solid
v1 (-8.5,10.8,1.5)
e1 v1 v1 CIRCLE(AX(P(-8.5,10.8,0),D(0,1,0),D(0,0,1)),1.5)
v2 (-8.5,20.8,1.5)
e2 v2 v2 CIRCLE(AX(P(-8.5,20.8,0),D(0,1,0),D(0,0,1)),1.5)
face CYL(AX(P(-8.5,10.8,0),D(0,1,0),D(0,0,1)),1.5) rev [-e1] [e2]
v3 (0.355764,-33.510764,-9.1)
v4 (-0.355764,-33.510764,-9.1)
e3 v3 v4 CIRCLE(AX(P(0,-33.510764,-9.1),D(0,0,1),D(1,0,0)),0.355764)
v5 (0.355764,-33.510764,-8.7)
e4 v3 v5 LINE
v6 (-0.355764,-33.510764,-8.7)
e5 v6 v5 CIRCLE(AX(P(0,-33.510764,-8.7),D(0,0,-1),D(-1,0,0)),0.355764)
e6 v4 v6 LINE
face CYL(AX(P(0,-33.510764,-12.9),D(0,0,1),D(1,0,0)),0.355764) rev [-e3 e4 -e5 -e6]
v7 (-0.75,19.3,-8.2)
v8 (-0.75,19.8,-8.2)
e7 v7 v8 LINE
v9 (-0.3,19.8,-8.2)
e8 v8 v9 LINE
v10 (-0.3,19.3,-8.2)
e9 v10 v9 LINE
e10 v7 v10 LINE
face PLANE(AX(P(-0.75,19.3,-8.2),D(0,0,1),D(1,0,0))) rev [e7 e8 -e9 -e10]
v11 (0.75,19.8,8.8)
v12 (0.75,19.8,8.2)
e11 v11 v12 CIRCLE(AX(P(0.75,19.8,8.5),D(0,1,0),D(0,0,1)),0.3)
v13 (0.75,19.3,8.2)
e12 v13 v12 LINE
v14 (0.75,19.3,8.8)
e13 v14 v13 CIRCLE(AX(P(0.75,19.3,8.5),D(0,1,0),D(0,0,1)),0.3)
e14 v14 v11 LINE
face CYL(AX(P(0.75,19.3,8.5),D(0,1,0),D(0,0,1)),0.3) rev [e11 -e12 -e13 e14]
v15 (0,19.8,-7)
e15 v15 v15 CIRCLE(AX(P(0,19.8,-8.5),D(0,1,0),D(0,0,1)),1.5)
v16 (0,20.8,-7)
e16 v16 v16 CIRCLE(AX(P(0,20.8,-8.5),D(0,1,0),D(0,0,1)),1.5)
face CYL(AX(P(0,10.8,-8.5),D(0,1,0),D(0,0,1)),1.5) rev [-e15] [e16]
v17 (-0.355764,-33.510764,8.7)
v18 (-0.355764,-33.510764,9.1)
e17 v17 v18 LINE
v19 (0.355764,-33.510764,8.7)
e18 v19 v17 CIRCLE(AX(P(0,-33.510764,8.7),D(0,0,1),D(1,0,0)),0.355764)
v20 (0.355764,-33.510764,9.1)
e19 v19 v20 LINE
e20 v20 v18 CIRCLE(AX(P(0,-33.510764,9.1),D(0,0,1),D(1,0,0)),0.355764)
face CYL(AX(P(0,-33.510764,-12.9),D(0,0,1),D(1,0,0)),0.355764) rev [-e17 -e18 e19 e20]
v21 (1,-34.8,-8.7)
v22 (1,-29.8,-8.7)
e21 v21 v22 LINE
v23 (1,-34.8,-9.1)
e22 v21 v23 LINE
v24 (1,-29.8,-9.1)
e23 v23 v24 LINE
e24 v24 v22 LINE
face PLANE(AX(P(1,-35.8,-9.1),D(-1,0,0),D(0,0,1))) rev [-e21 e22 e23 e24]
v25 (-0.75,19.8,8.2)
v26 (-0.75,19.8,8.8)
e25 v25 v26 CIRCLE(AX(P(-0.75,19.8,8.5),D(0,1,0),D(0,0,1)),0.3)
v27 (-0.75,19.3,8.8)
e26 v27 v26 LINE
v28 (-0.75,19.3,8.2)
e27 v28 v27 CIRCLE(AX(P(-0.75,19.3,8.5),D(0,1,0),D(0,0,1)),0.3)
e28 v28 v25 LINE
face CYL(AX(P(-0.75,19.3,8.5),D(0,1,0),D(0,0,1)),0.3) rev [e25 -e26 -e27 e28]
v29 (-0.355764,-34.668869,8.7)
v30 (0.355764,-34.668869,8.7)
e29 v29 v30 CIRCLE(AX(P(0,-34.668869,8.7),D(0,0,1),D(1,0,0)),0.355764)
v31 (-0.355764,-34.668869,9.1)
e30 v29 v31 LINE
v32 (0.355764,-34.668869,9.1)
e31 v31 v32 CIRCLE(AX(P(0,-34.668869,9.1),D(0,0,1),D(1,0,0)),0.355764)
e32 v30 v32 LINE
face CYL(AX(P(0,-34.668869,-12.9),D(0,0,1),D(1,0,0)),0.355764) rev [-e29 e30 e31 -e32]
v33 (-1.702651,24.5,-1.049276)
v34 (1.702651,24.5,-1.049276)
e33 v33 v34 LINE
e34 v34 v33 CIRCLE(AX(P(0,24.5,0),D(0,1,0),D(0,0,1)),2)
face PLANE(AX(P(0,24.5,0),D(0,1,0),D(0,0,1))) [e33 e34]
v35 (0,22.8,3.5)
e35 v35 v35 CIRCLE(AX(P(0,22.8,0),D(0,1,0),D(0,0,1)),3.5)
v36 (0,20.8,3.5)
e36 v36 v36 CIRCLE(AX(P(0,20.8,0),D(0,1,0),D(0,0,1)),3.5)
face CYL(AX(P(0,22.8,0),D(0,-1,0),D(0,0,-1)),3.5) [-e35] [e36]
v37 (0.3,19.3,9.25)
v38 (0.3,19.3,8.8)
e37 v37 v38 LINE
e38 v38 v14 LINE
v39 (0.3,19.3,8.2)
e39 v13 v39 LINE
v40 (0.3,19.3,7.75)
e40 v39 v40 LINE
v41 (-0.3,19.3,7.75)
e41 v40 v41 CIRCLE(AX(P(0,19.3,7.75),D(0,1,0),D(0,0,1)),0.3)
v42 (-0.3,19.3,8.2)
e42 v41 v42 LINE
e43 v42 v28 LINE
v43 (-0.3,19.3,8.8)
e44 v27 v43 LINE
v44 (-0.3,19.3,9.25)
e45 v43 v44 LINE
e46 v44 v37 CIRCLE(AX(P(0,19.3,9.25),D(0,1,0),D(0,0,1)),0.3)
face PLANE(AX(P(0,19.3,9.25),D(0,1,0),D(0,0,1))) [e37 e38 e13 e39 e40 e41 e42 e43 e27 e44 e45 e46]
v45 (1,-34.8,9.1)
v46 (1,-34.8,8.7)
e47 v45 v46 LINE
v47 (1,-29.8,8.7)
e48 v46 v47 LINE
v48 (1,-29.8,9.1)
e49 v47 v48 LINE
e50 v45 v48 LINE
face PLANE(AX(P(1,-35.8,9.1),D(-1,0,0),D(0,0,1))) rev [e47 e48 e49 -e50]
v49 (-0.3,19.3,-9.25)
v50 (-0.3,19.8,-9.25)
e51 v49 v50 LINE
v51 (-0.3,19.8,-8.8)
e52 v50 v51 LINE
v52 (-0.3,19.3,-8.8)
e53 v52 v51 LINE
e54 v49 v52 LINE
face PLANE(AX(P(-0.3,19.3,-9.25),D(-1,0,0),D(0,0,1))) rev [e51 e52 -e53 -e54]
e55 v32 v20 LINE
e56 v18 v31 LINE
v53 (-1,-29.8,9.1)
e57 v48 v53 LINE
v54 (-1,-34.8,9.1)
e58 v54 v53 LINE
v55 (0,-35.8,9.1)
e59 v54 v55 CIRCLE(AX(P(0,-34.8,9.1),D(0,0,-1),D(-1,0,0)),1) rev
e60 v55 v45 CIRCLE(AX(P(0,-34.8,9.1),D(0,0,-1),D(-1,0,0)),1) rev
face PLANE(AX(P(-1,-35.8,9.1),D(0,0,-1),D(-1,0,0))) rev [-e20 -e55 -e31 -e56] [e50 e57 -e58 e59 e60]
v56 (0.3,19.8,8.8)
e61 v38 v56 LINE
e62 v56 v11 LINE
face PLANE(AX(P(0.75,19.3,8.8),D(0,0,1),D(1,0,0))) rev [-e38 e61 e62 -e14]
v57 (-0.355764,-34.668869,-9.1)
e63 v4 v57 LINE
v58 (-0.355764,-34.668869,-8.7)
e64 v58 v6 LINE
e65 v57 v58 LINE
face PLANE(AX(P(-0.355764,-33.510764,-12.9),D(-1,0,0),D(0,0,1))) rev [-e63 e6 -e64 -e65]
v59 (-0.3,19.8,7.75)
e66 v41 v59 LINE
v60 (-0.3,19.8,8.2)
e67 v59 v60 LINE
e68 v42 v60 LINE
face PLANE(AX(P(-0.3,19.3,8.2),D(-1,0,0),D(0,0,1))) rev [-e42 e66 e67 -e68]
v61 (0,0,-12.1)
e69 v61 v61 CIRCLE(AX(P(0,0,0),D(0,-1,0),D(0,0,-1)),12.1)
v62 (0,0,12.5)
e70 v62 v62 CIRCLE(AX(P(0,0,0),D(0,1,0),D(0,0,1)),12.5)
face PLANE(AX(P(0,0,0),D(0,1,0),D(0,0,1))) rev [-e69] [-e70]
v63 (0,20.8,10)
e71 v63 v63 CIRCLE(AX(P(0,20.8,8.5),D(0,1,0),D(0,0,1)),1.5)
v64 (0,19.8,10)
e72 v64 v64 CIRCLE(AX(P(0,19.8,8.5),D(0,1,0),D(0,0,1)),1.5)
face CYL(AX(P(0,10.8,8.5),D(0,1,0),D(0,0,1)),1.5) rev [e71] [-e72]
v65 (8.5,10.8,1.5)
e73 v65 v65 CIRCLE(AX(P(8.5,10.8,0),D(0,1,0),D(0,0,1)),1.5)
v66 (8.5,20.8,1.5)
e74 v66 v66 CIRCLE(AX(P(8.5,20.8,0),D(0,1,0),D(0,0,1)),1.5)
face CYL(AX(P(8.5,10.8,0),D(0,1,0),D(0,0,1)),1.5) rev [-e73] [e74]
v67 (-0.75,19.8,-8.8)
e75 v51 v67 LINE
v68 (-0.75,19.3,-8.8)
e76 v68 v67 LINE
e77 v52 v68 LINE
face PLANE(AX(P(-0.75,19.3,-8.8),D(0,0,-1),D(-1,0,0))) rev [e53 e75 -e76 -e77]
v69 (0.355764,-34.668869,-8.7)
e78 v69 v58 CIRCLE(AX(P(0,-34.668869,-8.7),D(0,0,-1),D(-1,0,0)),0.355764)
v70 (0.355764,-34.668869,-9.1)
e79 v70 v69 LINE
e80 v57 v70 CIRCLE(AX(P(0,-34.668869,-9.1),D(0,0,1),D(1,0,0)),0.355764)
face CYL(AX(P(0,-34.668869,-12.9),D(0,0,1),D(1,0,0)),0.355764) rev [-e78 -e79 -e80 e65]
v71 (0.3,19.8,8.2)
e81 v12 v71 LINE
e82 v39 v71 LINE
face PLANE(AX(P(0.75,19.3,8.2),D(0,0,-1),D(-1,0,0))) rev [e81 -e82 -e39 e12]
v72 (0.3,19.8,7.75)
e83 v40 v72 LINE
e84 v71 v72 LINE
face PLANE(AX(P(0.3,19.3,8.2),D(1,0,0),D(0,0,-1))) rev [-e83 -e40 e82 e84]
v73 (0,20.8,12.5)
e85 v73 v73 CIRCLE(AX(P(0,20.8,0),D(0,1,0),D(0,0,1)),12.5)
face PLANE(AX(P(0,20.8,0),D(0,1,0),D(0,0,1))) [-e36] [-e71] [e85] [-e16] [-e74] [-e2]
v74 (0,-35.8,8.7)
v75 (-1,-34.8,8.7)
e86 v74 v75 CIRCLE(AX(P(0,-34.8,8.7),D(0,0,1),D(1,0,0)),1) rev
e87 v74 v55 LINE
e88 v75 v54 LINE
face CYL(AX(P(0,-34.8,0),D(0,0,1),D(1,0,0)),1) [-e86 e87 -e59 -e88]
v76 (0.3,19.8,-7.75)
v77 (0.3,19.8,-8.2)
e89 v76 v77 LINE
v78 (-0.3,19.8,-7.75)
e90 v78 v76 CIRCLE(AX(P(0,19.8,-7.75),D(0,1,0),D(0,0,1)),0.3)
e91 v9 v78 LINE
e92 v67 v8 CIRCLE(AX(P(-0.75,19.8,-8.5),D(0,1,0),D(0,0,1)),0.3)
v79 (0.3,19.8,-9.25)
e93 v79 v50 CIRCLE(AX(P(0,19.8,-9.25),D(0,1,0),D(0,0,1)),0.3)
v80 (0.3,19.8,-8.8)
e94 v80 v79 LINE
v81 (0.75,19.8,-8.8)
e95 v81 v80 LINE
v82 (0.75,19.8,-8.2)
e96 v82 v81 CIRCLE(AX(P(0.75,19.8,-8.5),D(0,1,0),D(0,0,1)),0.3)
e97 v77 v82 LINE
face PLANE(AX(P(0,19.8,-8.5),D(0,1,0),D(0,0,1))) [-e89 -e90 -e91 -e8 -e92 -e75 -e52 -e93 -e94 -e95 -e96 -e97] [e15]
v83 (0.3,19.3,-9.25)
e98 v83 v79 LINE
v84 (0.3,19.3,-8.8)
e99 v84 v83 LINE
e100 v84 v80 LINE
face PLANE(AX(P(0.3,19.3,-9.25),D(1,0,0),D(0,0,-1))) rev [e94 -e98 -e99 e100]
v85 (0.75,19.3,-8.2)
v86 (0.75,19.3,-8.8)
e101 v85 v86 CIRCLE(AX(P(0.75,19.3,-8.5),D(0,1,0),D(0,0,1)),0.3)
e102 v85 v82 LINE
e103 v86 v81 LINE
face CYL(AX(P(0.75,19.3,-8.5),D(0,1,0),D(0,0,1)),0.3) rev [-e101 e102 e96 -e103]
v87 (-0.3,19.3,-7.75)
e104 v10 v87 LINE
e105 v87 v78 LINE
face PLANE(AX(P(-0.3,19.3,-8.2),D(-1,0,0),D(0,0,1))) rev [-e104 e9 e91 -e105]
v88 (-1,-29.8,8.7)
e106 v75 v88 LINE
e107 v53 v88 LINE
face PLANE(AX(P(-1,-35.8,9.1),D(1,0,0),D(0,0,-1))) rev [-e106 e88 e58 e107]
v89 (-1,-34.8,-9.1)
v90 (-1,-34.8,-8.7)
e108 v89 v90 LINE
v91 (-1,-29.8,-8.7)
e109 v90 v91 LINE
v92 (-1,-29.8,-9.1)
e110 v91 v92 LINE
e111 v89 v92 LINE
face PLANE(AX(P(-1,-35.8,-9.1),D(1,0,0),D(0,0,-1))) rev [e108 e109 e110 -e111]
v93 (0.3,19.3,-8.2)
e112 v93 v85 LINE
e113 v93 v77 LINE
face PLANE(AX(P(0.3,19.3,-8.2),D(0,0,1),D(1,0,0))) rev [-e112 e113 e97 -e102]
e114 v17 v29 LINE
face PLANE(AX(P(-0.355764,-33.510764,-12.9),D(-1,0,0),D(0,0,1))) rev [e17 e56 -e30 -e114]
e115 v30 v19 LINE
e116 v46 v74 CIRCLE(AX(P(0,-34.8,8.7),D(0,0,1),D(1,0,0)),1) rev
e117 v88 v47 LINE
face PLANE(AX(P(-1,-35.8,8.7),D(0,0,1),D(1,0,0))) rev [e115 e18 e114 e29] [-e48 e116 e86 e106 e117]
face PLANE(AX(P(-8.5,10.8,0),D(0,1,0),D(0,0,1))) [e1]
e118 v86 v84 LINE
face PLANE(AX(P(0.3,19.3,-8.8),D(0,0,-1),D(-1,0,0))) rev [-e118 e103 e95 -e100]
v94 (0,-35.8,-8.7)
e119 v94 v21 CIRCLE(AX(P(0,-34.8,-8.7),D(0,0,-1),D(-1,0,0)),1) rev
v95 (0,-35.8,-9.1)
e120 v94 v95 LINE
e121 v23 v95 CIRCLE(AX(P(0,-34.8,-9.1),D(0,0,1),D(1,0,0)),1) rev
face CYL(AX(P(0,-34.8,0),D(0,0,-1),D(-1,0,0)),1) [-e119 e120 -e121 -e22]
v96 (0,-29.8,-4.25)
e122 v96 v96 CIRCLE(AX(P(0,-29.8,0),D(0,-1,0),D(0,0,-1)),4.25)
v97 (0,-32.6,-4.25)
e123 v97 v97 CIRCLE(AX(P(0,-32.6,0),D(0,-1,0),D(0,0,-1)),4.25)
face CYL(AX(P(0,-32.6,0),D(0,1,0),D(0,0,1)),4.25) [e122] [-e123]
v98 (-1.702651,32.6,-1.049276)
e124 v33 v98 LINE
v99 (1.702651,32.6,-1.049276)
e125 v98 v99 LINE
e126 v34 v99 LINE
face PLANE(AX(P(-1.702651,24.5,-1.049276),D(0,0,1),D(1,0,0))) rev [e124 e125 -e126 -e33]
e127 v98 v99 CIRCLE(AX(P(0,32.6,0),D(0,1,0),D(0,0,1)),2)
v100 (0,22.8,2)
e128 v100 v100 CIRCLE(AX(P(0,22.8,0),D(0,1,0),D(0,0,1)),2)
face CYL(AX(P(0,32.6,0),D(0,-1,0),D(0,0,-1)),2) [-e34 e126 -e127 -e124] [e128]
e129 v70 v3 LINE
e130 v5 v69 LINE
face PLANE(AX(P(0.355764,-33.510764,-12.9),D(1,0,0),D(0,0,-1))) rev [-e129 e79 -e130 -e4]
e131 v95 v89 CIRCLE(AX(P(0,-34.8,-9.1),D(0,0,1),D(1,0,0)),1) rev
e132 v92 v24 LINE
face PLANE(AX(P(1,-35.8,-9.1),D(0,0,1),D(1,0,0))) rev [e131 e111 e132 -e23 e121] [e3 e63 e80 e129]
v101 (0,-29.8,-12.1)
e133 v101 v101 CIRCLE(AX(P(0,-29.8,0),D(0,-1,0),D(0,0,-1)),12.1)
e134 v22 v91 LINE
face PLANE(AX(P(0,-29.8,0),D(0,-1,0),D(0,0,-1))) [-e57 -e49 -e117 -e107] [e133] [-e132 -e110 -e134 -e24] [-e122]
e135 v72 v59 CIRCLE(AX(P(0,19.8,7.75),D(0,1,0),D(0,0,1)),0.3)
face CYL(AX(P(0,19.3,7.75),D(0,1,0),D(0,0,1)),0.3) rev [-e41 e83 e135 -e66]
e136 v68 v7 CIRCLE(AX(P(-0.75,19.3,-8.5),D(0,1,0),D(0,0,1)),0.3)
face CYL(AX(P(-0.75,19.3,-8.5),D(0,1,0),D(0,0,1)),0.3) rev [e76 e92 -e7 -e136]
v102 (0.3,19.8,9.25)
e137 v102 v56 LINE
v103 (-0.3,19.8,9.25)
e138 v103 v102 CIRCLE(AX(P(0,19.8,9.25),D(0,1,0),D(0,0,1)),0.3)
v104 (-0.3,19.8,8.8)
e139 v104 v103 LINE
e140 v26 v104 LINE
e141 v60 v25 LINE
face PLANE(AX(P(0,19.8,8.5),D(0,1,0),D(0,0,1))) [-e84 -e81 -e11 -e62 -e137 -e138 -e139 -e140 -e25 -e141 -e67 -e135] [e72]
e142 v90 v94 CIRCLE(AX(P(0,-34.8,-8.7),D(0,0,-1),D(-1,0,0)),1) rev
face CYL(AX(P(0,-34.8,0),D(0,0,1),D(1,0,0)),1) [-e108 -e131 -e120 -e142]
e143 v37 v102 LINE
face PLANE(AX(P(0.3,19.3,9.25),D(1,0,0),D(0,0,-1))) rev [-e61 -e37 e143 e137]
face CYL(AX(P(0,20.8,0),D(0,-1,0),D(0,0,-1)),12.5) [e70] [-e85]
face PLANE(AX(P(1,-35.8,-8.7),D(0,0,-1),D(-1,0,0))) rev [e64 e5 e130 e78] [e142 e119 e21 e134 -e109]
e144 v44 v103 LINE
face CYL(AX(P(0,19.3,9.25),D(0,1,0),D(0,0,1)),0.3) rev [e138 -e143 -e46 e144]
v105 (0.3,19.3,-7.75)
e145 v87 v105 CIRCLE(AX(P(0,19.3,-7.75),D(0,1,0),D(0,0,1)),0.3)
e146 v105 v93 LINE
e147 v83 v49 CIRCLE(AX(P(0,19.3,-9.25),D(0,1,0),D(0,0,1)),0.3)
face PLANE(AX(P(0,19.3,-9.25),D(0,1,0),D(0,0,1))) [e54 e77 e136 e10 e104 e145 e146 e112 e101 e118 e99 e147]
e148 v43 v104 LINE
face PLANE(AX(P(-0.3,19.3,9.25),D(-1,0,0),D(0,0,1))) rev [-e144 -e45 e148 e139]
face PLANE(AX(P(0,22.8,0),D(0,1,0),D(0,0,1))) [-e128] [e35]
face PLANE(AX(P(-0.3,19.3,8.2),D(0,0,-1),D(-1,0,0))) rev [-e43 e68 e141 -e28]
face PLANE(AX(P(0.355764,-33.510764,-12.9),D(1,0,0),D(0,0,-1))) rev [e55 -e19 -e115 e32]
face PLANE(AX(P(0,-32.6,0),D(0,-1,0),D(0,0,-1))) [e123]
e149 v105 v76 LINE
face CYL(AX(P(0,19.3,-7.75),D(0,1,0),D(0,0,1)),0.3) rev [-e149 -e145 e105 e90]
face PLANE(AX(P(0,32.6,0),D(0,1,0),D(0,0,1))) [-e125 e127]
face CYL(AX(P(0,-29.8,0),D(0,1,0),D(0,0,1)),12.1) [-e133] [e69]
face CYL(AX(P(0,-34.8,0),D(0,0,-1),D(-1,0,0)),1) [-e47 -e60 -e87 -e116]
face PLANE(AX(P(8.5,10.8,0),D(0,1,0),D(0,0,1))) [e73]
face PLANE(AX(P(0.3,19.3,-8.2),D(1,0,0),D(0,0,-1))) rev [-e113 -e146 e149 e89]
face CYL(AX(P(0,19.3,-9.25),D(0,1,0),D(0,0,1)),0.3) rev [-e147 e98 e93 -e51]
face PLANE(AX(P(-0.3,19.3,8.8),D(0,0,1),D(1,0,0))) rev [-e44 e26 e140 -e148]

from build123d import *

# Parameters (mm, degrees)
ESBO_O1_R                = 12.5
RESSALTO_EXTRUS_O1_DEPTH = 20.8
ESBO_O2_R                = 12.1
RESSALTO_EXTRUS_O2_DEPTH = 29.8
ESBO_O3_R                = 2
RESSALTO_EXTRUS_O3_DEPTH = 11.8
CORTE_EXTRUS_O1_START    = -8.1
CORTE_EXTRUS_O1_DEPTH    = 8.1
ESBO_O5_R                = 3.5
RESSALTO_EXTRUS_O4_DEPTH = 2
ESBO_O6_R                = 1.5
CORTE_EXTRUS_O2_DEPTH    = 10
RESSALTO_EXTRUS_O5_START = 9
ESBO_O8_R                = 1.5
RESSALTO_EXTRUS_O5_DEPTH = 9
CORTE_EXTRUS_O3_DEPTH    = 0.5
ESBO_O10_R               = 4.25
RESSALTO_EXTRUS_O6_DEPTH = 2.8
ESBO_O11_W               = 2
ESBO_O11_H               = 0.4
RESSALTO_EXTRUS_O8_DEPTH = 6
FILETE1_R                = 1
CORTE_EXTRUS_O4_DEPTH    = 22


with BuildPart() as part:
    # Esboço1 → Ressalto-extrusão1 (new body)
    with BuildSketch(Plane(origin=(0, 0, 0), x_dir=(1, 0, 0), z_dir=(0, 1, 0))):
        with Locations(Location((0, 0, 0), (0, 0, 270))):
            Circle(ESBO_O1_R)
    extrude(amount=RESSALTO_EXTRUS_O1_DEPTH)

    # Esboço2 → Ressalto-extrusão2 (add)
    with BuildSketch(Plane(origin=(0, 0, 0), x_dir=(-1, 0, 0), z_dir=(0, -1, 0))):
        with Locations(Location((0, 0, 0), (0, 0, 90))):
            Circle(ESBO_O2_R)
    extrude(amount=RESSALTO_EXTRUS_O2_DEPTH)

    # Esboço3 → Ressalto-extrusão3 (add)
    with BuildSketch(Plane(origin=(0, 20.8, 0), x_dir=(1, 0, 0), z_dir=(0, 1, 0))):
        with Locations(Location((0, 0, 0), (0, 0, 270))):
            Circle(ESBO_O3_R)
    extrude(amount=RESSALTO_EXTRUS_O3_DEPTH)

    # Esboço4 → Corte-extrusão1 (cut)
    with BuildSketch(Plane(origin=(0, 32.6, 0), x_dir=(1, 0, 0), z_dir=(0, 1, 0)).offset(CORTE_EXTRUS_O1_START)):
        with BuildLine():
            Line((-1.702650866, 1.049275955), (1.702650866, 1.049275955))
            ThreePointArc((1.702650866, 1.049275955), (0, 2), (-1.702650866, 1.049275955))
        make_face()
    extrude(amount=CORTE_EXTRUS_O1_DEPTH, mode=Mode.SUBTRACT)

    # Esboço5 → Ressalto-extrusão4 (add)
    with BuildSketch(Plane(origin=(0, 20.8, 0), x_dir=(1, 0, 0), z_dir=(0, 1, 0))):
        with Locations(Location((0, 0, 0), (0, 0, 270))):
            Circle(ESBO_O5_R)
    extrude(amount=RESSALTO_EXTRUS_O4_DEPTH)

    # Esboço6 → Corte-extrusão2 (cut)
    with BuildSketch(Plane(origin=(0, 20.8, 0), x_dir=(1, 0, 0), z_dir=(0, 1, 0))):
        with Locations(Location((0, 8.5, 0), (0, 0, 270))):
            Circle(ESBO_O6_R)
        with Locations(Location((8.5, 0, 0), (0, 0, 270))):
            Circle(ESBO_O6_R)
        with Locations(Location((0, -8.5, 0), (0, 0, 270))):
            Circle(ESBO_O6_R)
        with Locations(Location((-8.5, 0, 0), (0, 0, 270))):
            Circle(ESBO_O6_R)
    extrude(amount=-CORTE_EXTRUS_O2_DEPTH, mode=Mode.SUBTRACT)

    # Esboço8 → Ressalto-extrusão5 (add)
    with BuildSketch(Plane(origin=(0, 10.8, 0), x_dir=(1, 0, 0), z_dir=(0, 1, 0)).offset(RESSALTO_EXTRUS_O5_START)):
        with Locations(Location((0, 8.5, 0), (0, 0, 270))):
            Circle(ESBO_O8_R)
        with Locations(Location((0, -8.5, 0), (0, 0, 270))):
            Circle(ESBO_O8_R)
    extrude(amount=-RESSALTO_EXTRUS_O5_DEPTH)

    # Esboço9 → Corte-extrusão3 (cut)
    with BuildSketch(Plane(origin=(0, 19.8, 0), x_dir=(1, 0, 0), z_dir=(0, 1, 0))):
        with BuildLine():
            Line((-0.3, 8.2), (-0.3, 7.75))
            ThreePointArc((-0.3, 7.75), (0, 7.45), (0.3, 7.75))
            Line((0.3, 7.75), (0.3, 8.2))
            Line((0.3, 8.2), (0.75, 8.2))
            ThreePointArc((0.75, 8.2), (1.05, 8.5), (0.75, 8.8))
            Line((0.75, 8.8), (0.3, 8.8))
            Line((0.3, 8.8), (0.3, 9.25))
            ThreePointArc((0.3, 9.25), (0, 9.55), (-0.3, 9.25))
            Line((-0.3, 9.25), (-0.3, 8.8))
            Line((-0.3, 8.8), (-0.75, 8.8))
            ThreePointArc((-0.75, 8.8), (-1.05, 8.5), (-0.75, 8.2))
            Line((-0.75, 8.2), (-0.3, 8.2))
        make_face()
        with BuildLine():
            Line((0.3, -8.2), (0.3, -7.75))
            ThreePointArc((0.3, -7.75), (0, -7.45), (-0.3, -7.75))
            Line((-0.3, -7.75), (-0.3, -8.2))
            Line((-0.3, -8.2), (-0.75, -8.2))
            ThreePointArc((-0.75, -8.2), (-1.05, -8.5), (-0.75, -8.8))
            Line((-0.75, -8.8), (-0.3, -8.8))
            Line((-0.3, -8.8), (-0.3, -9.25))
            ThreePointArc((-0.3, -9.25), (0, -9.55), (0.3, -9.25))
            Line((0.3, -9.25), (0.3, -8.8))
            Line((0.3, -8.8), (0.75, -8.8))
            ThreePointArc((0.75, -8.8), (1.05, -8.5), (0.75, -8.2))
            Line((0.75, -8.2), (0.3, -8.2))
        make_face()
    extrude(amount=-CORTE_EXTRUS_O3_DEPTH, mode=Mode.SUBTRACT)

    # Esboço10 → Ressalto-extrusão6 (add)
    with BuildSketch(Plane.XZ.offset(29.8)):
        with Locations(Location((0, 0, 0), (0, 0, 270))):
            Circle(ESBO_O10_R)
    extrude(amount=RESSALTO_EXTRUS_O6_DEPTH)

    # Esboço11 → Ressalto-extrusão8 (add)
    with BuildSketch(Plane(origin=(0, -29.8, 0), x_dir=(-1, 0, 0), z_dir=(0, -1, 0))):
        with Locations((0, 8.9)):
            Rectangle(ESBO_O11_W, ESBO_O11_H)
        with Locations((0, -8.9)):
            Rectangle(ESBO_O11_W, ESBO_O11_H)
    extrude(amount=RESSALTO_EXTRUS_O8_DEPTH)

    # Filete1
    filete1_edges = [part.edges().sort_by_distance(p)[0] for p in [
        (1, -35.8, -8.9),
        (-1, -35.8, -8.9),
        (-1, -35.8, 8.9),
        (1, -35.8, 8.9),
    ]]
    fillet(filete1_edges, radius=FILETE1_R - 0.0001)  # a hair under: the kernel refuses the full size

    # Esboço12 → Corte-extrusão4 (cut)
    with BuildSketch(Plane.XY.offset(9.1)):
        with BuildLine():
            Line((0.355764182, -33.51076438), (0.355764182, -34.668869147))
            ThreePointArc((0.355764182, -34.668869147), (0, -35.024633329), (-0.355764182, -34.668869147))
            Line((-0.355764182, -34.668869147), (-0.355764182, -33.51076438))
            ThreePointArc((-0.355764182, -33.51076438), (0, -33.155000198), (0.355764182, -33.51076438))
        make_face()
    extrude(amount=-CORTE_EXTRUS_O4_DEPTH, mode=Mode.SUBTRACT)


solid = part.part
